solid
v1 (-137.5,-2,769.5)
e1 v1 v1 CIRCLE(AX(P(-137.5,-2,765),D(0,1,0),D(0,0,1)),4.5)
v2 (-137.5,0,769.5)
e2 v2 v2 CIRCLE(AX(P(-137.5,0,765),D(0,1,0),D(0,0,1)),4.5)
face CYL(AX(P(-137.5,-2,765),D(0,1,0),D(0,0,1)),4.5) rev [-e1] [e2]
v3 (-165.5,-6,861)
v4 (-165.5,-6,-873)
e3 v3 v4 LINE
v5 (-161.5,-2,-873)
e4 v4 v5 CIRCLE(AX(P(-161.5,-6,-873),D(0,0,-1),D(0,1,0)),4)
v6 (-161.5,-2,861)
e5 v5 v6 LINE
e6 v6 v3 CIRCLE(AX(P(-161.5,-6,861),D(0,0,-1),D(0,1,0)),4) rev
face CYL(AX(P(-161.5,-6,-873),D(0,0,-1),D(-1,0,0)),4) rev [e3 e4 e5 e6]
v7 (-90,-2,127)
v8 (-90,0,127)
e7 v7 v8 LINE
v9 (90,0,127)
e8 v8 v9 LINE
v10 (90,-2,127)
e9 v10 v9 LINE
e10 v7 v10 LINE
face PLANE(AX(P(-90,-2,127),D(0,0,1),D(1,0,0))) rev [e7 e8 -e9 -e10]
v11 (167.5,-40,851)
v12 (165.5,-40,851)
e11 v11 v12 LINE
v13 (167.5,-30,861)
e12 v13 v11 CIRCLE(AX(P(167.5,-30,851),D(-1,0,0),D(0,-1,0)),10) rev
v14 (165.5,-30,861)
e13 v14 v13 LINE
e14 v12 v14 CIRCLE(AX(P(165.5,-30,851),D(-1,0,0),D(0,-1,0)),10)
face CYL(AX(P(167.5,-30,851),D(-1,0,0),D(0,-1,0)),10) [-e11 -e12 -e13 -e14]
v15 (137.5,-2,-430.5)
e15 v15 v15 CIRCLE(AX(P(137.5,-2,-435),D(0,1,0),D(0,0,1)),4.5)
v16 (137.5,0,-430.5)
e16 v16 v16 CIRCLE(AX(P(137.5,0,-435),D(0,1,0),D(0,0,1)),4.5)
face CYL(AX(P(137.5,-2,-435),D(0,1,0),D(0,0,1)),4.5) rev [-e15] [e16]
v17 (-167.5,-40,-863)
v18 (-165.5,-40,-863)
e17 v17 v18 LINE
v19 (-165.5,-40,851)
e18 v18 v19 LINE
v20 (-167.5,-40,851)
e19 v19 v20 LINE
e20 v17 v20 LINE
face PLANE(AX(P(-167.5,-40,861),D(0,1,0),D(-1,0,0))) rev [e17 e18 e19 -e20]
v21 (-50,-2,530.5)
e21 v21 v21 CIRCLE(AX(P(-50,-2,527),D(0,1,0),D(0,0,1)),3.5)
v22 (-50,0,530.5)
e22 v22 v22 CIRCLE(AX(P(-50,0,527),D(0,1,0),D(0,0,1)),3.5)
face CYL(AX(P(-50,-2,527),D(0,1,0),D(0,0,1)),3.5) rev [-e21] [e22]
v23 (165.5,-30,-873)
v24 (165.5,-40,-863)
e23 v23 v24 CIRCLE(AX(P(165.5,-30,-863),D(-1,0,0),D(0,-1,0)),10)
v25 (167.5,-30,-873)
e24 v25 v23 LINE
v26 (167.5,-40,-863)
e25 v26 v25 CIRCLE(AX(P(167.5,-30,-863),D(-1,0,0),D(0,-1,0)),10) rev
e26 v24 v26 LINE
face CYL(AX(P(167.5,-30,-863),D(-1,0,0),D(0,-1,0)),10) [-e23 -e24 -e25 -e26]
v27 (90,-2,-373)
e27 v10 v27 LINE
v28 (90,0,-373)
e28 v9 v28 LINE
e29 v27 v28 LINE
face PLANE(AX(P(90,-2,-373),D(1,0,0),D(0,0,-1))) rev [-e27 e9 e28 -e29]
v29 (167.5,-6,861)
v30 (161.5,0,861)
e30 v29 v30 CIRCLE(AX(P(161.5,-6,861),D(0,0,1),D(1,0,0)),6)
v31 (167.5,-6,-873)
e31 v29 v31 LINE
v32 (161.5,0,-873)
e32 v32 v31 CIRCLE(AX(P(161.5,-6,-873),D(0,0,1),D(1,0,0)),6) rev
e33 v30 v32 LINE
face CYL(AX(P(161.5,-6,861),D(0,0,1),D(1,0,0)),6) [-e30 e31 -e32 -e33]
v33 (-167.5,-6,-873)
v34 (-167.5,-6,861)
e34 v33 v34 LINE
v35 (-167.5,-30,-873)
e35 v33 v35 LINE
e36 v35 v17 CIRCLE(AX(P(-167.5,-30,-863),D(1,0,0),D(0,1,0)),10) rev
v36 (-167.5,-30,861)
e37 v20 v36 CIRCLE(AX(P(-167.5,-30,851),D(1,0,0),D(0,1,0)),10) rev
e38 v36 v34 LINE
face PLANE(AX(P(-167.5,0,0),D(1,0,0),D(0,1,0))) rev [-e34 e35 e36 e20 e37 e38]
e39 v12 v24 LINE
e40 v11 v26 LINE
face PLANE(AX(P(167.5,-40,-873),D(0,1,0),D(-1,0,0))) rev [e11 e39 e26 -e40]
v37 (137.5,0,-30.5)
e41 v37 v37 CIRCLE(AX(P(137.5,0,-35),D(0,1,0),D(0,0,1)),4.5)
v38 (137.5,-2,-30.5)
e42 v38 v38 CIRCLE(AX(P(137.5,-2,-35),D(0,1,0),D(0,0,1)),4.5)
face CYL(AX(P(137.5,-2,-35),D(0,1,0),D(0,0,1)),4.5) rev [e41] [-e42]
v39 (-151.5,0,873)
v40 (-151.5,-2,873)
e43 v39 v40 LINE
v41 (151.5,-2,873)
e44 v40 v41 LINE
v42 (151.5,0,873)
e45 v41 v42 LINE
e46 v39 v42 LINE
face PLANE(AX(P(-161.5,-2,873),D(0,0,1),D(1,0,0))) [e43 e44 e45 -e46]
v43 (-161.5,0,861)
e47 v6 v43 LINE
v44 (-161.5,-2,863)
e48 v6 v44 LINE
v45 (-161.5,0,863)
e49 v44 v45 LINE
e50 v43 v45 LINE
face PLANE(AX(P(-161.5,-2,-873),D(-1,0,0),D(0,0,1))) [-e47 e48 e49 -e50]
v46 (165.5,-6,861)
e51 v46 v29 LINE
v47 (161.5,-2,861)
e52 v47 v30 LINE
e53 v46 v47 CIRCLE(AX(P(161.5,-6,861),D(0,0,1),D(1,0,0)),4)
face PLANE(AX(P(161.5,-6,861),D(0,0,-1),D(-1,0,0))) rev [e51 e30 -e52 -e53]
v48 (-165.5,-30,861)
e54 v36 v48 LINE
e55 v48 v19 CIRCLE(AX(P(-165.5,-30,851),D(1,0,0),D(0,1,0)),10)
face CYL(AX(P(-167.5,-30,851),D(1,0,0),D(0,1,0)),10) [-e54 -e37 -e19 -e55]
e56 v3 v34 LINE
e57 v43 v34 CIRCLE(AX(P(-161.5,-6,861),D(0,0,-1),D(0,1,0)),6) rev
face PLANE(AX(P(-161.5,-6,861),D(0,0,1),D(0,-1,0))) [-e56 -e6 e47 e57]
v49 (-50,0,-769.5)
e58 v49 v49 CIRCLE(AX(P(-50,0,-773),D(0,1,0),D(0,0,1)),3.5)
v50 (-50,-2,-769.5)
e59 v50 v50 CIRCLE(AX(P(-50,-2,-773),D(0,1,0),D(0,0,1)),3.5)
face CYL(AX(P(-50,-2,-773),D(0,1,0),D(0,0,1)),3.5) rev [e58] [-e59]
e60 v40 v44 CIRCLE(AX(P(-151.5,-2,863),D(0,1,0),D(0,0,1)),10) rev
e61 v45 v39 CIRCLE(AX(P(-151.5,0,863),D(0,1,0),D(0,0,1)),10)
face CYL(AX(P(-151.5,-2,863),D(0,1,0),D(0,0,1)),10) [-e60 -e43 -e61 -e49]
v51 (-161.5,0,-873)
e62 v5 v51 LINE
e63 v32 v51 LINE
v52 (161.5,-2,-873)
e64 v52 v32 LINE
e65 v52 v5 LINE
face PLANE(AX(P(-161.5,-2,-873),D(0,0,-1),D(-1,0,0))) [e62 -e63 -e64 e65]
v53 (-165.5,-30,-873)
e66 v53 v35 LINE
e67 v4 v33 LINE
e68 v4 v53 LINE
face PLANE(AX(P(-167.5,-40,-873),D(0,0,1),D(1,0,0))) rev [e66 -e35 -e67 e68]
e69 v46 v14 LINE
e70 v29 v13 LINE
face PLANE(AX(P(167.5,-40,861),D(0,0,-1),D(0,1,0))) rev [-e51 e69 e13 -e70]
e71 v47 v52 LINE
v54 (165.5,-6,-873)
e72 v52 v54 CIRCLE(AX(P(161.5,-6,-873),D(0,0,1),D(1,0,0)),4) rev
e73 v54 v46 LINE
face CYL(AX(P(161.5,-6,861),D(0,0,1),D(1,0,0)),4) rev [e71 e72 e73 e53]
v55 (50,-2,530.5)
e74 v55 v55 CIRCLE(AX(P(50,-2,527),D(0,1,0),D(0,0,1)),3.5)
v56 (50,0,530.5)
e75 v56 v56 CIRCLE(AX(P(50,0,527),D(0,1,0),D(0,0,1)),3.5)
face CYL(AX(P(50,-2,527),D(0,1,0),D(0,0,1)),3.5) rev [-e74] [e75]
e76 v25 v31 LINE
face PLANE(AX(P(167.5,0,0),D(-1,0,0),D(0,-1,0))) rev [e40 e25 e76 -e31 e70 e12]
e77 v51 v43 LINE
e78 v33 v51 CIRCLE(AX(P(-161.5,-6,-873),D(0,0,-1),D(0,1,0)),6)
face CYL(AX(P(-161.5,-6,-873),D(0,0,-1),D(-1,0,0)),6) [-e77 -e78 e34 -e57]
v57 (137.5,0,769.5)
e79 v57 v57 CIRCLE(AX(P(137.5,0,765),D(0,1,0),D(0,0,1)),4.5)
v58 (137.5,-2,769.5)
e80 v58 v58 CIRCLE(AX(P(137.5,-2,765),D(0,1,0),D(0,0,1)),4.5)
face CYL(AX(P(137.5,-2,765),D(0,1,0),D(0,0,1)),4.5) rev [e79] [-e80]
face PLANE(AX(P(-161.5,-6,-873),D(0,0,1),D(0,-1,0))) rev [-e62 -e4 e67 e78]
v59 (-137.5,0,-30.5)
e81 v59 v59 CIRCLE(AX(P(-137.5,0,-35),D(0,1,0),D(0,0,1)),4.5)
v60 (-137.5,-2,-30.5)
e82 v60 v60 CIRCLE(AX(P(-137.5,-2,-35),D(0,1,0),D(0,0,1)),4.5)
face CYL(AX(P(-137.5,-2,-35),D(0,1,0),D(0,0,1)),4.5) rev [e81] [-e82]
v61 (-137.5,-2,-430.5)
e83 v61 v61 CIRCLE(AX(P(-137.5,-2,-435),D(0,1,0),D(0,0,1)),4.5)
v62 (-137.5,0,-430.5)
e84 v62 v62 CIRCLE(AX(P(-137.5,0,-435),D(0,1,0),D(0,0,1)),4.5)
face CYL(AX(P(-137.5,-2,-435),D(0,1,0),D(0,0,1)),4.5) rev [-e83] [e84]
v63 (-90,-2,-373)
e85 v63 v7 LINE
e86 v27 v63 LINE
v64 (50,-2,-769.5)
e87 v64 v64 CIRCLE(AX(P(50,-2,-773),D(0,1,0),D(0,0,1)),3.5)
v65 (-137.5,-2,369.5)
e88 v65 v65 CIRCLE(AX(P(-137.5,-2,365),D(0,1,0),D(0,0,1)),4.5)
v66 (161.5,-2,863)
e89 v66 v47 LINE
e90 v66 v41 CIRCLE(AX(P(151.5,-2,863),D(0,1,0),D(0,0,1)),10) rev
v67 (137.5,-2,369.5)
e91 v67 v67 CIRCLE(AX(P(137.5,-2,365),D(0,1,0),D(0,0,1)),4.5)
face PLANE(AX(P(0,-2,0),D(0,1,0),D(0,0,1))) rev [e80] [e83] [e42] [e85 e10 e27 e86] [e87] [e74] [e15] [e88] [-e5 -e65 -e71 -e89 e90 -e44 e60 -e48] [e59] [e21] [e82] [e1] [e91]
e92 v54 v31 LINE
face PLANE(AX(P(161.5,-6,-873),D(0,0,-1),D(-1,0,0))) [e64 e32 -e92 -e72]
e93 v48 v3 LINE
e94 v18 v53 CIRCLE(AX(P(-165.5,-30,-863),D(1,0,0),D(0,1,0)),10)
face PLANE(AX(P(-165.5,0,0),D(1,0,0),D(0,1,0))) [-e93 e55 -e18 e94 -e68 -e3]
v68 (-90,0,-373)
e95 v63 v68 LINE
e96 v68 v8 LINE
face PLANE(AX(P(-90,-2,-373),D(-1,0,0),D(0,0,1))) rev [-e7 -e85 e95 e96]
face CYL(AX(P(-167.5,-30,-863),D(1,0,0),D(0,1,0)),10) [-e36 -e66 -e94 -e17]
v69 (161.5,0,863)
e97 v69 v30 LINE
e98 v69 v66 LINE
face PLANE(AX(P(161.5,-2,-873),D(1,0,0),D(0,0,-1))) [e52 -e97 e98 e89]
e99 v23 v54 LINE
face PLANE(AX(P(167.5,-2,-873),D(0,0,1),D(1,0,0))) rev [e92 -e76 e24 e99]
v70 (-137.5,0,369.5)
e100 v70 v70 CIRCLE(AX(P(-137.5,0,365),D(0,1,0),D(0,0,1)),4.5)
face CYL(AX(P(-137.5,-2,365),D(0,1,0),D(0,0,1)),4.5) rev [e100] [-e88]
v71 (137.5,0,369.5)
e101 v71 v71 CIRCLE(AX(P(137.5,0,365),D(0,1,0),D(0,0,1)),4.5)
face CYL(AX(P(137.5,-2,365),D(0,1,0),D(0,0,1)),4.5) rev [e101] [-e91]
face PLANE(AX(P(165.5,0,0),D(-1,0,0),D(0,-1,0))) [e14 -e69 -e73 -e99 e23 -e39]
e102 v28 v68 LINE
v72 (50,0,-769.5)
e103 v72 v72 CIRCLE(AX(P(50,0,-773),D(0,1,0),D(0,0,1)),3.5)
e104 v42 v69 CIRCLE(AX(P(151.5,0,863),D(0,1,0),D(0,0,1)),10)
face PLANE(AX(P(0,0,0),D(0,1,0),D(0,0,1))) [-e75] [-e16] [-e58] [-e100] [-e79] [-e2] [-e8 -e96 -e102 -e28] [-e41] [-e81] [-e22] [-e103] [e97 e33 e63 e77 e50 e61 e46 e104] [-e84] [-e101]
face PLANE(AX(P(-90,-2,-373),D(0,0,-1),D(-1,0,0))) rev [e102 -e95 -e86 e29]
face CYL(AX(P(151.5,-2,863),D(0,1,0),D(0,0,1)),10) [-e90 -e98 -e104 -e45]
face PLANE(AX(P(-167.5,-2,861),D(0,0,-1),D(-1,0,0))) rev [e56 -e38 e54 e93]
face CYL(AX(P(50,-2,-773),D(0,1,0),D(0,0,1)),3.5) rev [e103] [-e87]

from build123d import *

# Parameters (mm, degrees)
SKETCH_1_W                  = 323
SKETCH_1_H                  = 1746
SKETCH_1_R                  = 4.5
SKETCH_1_R_2                = 3.5
SKETCH_1_W_2                = 180
SKETCH_1_H_2                = 500
SM_BASE_FLANGE_1_DEPTH      = 2
SM_EDGE_FLANGE_1_DEPTH      = 1734
SM_EDGE_FLANGE_1_BEND_DEPTH = 1734
FILLET_1_R                  = 10
FILLET_2_R                  = 10


# Sheet-metal steps are written as plain solids
with BuildPart() as part:
    # Sketch 1 → Базовая кромка1 (new body)
    with BuildSketch(Plane(origin=(0, 0, 0), x_dir=(1, 0, 0), z_dir=(0, 1, 0))):
        Rectangle(SKETCH_1_W, SKETCH_1_H)
        with Locations(Location((-137.5, -765, 0), (0, 0, 270))):
            Circle(SKETCH_1_R, mode=Mode.SUBTRACT)
        with Locations(Location((137.5, -765, 0), (0, 0, 270))):
            Circle(SKETCH_1_R, mode=Mode.SUBTRACT)
        with Locations(Location((-137.5, -365, 0), (0, 0, 270))):
            Circle(SKETCH_1_R, mode=Mode.SUBTRACT)
        with Locations(Location((137.5, -365, 0), (0, 0, 270))):
            Circle(SKETCH_1_R, mode=Mode.SUBTRACT)
        with Locations(Location((-137.5, 35, 0), (0, 0, 270))):
            Circle(SKETCH_1_R, mode=Mode.SUBTRACT)
        with Locations(Location((137.5, 35, 0), (0, 0, 270))):
            Circle(SKETCH_1_R, mode=Mode.SUBTRACT)
        with Locations(Location((-137.5, 435, 0), (0, 0, 270))):
            Circle(SKETCH_1_R, mode=Mode.SUBTRACT)
        with Locations(Location((137.5, 435, 0), (0, 0, 270))):
            Circle(SKETCH_1_R, mode=Mode.SUBTRACT)
        with Locations(Location((-50, -527, 0), (0, 0, 270))):
            Circle(SKETCH_1_R_2, mode=Mode.SUBTRACT)
        with Locations(Location((50, -527, 0), (0, 0, 270))):
            Circle(SKETCH_1_R_2, mode=Mode.SUBTRACT)
        with Locations(Location((-50, 773, 0), (0, 0, 270))):
            Circle(SKETCH_1_R_2, mode=Mode.SUBTRACT)
        with Locations(Location((50, 773, 0), (0, 0, 270))):
            Circle(SKETCH_1_R_2, mode=Mode.SUBTRACT)
        with Locations((0, 123)):
            Rectangle(SKETCH_1_W_2, SKETCH_1_H_2, mode=Mode.SUBTRACT)
    extrude(amount=-SM_BASE_FLANGE_1_DEPTH)

    # Ребро-кромка1 section (across the edge) → Ребро-кромка1 (add)
    with BuildSketch(Plane(origin=(165.5, -2, -873), x_dir=(-1, 0, 0), z_dir=(0, 0, 1))):
        with BuildLine():
            Line((-2, 4), (-2, 38))
            Line((-2, 38), (0, 38))
            Line((0, 38), (0, 4))
            ThreePointArc((0, 4), (1.171572875, 1.171572875), (4, 0))
            Line((4, 0), (4, -2))
            ThreePointArc((4, -2), (-0.242640687, -0.242640687), (-2, 4))
        make_face()
    extrude(amount=SM_EDGE_FLANGE_1_DEPTH)

    # Ребро-кромка1 section 2 (across the edge) → Ребро-кромка1 bend (add)
    with BuildSketch(Plane(origin=(-165.5, -2, 861), x_dir=(1, 0, 0), z_dir=(0, 0, -1))):
        with BuildLine():
            Line((-2, 4), (-2, 38))
            Line((-2, 38), (0, 38))
            Line((0, 38), (0, 4))
            ThreePointArc((0, 4), (1.171572875, 1.171572875), (4, 0))
            Line((4, 0), (4, -2))
            ThreePointArc((4, -2), (-0.242640687, -0.242640687), (-2, 4))
        make_face()
    extrude(amount=SM_EDGE_FLANGE_1_BEND_DEPTH)

    # Скругление1
    fillet_1_edges = [part.edges().sort_by_distance(p)[0] for p in [
        (-166.5, -40, 861),
        (-166.5, -40, -873),
        (166.5, -40, -873),
        (166.5, -40, 861),
    ]]
    fillet(fillet_1_edges, radius=FILLET_1_R)

    # Скругление2
    fillet_2_edges = [part.edges().sort_by_distance(p)[0] for p in [
        (161.5, -1, 873),
        (-161.5, -1, 873),
    ]]
    fillet(fillet_2_edges, radius=FILLET_2_R)


solid = part.part
